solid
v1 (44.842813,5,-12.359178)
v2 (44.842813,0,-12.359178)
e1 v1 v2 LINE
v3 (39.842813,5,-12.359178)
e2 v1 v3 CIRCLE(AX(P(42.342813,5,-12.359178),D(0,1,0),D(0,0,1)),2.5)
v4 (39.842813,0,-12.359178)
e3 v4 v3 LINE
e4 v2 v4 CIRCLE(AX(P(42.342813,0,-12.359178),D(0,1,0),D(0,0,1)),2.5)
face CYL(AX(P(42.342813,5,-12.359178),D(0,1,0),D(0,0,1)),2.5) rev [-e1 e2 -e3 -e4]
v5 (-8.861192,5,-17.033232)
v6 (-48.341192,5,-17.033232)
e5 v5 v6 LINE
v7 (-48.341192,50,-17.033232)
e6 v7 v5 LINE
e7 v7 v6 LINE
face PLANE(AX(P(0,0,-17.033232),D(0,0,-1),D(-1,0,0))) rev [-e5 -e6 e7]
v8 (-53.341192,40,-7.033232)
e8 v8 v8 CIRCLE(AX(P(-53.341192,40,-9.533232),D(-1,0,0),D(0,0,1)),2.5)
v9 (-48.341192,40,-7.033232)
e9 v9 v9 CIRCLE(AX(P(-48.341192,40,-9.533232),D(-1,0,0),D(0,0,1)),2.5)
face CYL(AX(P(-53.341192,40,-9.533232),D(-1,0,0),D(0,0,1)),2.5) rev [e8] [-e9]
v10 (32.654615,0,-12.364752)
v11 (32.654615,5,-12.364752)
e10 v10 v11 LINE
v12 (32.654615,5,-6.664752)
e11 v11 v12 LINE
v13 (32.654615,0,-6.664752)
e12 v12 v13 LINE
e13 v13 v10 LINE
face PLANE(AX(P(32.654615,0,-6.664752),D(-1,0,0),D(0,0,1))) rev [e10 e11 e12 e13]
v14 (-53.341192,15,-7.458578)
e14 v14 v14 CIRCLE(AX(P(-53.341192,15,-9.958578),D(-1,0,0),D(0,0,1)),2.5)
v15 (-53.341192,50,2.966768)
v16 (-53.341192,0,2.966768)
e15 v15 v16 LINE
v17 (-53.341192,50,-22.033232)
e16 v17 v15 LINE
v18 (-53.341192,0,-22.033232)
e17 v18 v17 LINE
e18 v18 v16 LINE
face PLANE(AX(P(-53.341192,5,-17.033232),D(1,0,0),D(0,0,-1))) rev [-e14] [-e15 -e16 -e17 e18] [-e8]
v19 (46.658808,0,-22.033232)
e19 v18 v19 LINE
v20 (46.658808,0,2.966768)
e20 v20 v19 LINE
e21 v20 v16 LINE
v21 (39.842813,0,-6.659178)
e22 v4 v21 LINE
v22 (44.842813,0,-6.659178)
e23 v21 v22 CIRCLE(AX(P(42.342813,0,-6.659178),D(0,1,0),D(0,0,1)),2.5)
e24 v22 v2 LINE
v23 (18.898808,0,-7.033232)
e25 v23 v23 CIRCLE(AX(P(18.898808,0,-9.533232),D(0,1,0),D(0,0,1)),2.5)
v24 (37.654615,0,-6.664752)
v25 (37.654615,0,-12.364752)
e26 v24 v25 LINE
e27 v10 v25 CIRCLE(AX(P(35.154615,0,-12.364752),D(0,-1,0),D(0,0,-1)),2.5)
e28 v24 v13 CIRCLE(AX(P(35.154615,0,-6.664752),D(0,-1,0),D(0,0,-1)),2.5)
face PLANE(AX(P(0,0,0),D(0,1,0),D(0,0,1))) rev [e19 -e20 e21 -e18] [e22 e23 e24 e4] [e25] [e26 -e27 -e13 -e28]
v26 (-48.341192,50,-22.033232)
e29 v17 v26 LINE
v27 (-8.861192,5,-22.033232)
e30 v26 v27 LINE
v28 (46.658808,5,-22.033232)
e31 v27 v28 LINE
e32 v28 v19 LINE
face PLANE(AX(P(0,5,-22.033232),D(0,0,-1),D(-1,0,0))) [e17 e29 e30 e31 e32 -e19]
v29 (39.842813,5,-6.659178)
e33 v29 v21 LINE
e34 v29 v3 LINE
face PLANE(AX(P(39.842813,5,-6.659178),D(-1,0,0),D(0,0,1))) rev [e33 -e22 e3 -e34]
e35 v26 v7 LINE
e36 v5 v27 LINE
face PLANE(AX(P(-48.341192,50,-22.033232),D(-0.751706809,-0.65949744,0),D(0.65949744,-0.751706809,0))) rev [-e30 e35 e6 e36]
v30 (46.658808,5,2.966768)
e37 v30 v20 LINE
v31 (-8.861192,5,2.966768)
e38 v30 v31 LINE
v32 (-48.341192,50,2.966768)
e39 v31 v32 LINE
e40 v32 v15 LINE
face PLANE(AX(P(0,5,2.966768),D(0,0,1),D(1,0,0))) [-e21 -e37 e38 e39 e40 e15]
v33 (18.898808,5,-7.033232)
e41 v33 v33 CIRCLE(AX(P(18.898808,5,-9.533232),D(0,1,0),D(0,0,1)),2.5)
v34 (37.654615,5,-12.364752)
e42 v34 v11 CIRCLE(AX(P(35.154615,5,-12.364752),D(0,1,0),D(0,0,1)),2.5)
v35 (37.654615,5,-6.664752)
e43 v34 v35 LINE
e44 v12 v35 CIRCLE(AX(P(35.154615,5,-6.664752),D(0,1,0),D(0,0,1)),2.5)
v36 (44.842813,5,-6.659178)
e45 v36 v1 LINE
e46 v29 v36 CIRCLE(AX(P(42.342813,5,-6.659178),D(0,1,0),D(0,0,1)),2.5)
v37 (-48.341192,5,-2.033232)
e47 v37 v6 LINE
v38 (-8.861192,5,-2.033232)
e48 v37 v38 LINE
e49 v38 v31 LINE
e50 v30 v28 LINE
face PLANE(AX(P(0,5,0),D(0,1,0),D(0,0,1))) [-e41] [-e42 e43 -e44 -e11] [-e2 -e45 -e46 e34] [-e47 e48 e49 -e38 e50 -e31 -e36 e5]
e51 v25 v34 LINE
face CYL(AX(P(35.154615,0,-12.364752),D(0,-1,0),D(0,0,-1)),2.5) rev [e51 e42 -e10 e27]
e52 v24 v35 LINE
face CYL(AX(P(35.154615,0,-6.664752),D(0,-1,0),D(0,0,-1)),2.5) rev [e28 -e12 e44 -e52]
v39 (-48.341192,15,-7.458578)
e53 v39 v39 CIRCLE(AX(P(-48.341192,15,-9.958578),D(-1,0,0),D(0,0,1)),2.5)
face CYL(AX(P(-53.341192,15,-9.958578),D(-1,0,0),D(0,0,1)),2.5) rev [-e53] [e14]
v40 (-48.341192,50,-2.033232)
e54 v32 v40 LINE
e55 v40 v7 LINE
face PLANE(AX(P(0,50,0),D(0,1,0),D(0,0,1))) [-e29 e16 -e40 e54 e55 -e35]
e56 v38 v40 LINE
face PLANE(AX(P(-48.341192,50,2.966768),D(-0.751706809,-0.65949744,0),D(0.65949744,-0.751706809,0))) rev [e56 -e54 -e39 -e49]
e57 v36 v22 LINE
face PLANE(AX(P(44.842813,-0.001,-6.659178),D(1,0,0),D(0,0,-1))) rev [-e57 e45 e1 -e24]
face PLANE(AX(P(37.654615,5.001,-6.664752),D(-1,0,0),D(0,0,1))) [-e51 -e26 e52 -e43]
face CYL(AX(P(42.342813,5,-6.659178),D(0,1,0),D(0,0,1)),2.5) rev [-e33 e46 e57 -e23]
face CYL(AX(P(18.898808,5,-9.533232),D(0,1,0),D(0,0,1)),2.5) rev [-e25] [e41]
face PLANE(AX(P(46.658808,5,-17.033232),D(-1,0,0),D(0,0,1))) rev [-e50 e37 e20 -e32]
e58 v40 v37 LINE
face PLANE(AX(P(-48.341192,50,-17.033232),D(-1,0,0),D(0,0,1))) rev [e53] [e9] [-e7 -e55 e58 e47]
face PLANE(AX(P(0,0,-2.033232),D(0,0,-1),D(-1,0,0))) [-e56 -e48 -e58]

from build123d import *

# Parameters (mm, degrees)
SKETCH1_W                 = 100
SKETCH1_H                 = 15
BOSS_EXTRUDE1_DEPTH       = 5
SKETCH2_W                 = 5
SKETCH2_H                 = 15
BOSS_EXTRUDE2_DEPTH       = 45
SKETCH3_W                 = 55.52
SKETCH3_H                 = 5
BOSS_EXTRUDE3_DEPTH       = 5
F_5_0MM_DOWEL_SLOT1_DEPTH = 5
F_5_0MM_DOWEL_SLOT2_DEPTH = 5
F_5_0MM_DOWEL_HOLE1_D     = 5
F_5_0MM_DOWEL_HOLE2_D     = 5
BOSS_EXTRUDE4_DEPTH       = 5
BOSS_EXTRUDE5_DEPTH       = 5


# Read off the part's stored shape, not the designer's step: Ø5.0mm Dowel Slot1, Ø5.0mm Dowel Slot2
with BuildPart() as part:
    # Sketch1 → Boss-Extrude1 (new body)
    with BuildSketch(Plane(origin=(0, 0, 0), x_dir=(1, 0, 0), z_dir=(0, 1, 0))):
        with Locations((-3.34119197, 9.533232324)):
            Rectangle(SKETCH1_W, SKETCH1_H)
    extrude(amount=BOSS_EXTRUDE1_DEPTH)

    # Sketch2 → Boss-Extrude2 (add)
    with BuildSketch(Plane(origin=(0, 5, 0), x_dir=(1, 0, 0), z_dir=(0, 1, 0))):
        with Locations((-50.84119197, 9.533232324)):
            Rectangle(SKETCH2_W, SKETCH2_H)
    extrude(amount=BOSS_EXTRUDE2_DEPTH)

    # Sketch3 → Boss-Extrude3 (add)
    with BuildSketch(Plane(origin=(0, 0, 0), x_dir=(-1, 0, 0), z_dir=(0, -1, 0))):
        with Locations((-18.89880803, 19.533232324)):
            Rectangle(SKETCH3_W, SKETCH3_H)
        with Locations((-18.89880803, -0.466767676)):
            Rectangle(SKETCH3_W, SKETCH3_H)
    extrude(amount=-BOSS_EXTRUDE3_DEPTH)

    # Ø5.0mm Dowel Slot1 outline → Ø5.0mm Dowel Slot1 (cut)
    with BuildSketch(Plane(origin=(0, 0, 0), x_dir=(1, 0, 0), z_dir=(0, 1, 0))):
        with BuildLine():
            Line((44.842812818, 6.659177942), (44.842812818, 12.359177942))
            ThreePointArc((44.842812818, 12.359177942), (42.342812818, 14.859177942), (39.842812818, 12.359177942))
            Line((39.842812818, 12.359177942), (39.842812818, 6.659177942))
            ThreePointArc((39.842812818, 6.659177942), (42.342812818, 4.159177942), (44.842812818, 6.659177942))
        make_face()
    extrude(amount=F_5_0MM_DOWEL_SLOT1_DEPTH, mode=Mode.SUBTRACT)

    # Ø5.0mm Dowel Slot2 outline → Ø5.0mm Dowel Slot2 (cut)
    with BuildSketch(Plane(origin=(0, 0, 0), x_dir=(1, 0, 0), z_dir=(0, 1, 0))):
        with BuildLine():
            ThreePointArc((37.654614979, 12.36475158), (35.154614979, 14.86475158), (32.654614979, 12.36475158))
            Line((32.654614979, 12.36475158), (32.654614979, 6.66475158))
            ThreePointArc((32.654614979, 6.66475158), (35.154614979, 4.16475158), (37.654614979, 6.66475158))
            Line((37.654614979, 6.66475158), (37.654614979, 12.36475158))
        make_face()
    extrude(amount=F_5_0MM_DOWEL_SLOT2_DEPTH, mode=Mode.SUBTRACT)

    # Ø5.0mm Dowel Hole1 (through all)
    with Locations(Plane.ZY.offset(53.34119197)):
        with Locations((-9.533232324, 40), (-9.958577789, 15)):
            Hole(F_5_0MM_DOWEL_HOLE1_D / 2)

    # Ø5.0mm Dowel Hole2 (through all)
    with Locations(Plane(origin=(0, 5, 0), x_dir=(1, 0, 0), z_dir=(0, 1, 0))):
        with Locations((18.89880803, 9.533232324)):
            Hole(F_5_0MM_DOWEL_HOLE2_D / 2)

    # Sketch15 → Boss-Extrude4 (add)
    with BuildSketch(Plane.XY.offset(-2.033232324)):
        Polygon((-48.34119197, 50), (-8.86119197, 5), (-8.86119197, 0), (-53.34119197, 0), (-53.34119197, 50), align=None)
    extrude(amount=BOSS_EXTRUDE4_DEPTH)

    # Sketch16 → Boss-Extrude5 (add)
    with BuildSketch(Plane(origin=(0, 0, -17.033232324), x_dir=(-1, 0, 0), z_dir=(0, 0, -1))):
        Polygon((48.34119197, 50), (8.86119197, 5), (8.86119197, 0), (53.34119197, 0), (53.34119197, 50), align=None)
    extrude(amount=BOSS_EXTRUDE5_DEPTH)


solid = part.part
